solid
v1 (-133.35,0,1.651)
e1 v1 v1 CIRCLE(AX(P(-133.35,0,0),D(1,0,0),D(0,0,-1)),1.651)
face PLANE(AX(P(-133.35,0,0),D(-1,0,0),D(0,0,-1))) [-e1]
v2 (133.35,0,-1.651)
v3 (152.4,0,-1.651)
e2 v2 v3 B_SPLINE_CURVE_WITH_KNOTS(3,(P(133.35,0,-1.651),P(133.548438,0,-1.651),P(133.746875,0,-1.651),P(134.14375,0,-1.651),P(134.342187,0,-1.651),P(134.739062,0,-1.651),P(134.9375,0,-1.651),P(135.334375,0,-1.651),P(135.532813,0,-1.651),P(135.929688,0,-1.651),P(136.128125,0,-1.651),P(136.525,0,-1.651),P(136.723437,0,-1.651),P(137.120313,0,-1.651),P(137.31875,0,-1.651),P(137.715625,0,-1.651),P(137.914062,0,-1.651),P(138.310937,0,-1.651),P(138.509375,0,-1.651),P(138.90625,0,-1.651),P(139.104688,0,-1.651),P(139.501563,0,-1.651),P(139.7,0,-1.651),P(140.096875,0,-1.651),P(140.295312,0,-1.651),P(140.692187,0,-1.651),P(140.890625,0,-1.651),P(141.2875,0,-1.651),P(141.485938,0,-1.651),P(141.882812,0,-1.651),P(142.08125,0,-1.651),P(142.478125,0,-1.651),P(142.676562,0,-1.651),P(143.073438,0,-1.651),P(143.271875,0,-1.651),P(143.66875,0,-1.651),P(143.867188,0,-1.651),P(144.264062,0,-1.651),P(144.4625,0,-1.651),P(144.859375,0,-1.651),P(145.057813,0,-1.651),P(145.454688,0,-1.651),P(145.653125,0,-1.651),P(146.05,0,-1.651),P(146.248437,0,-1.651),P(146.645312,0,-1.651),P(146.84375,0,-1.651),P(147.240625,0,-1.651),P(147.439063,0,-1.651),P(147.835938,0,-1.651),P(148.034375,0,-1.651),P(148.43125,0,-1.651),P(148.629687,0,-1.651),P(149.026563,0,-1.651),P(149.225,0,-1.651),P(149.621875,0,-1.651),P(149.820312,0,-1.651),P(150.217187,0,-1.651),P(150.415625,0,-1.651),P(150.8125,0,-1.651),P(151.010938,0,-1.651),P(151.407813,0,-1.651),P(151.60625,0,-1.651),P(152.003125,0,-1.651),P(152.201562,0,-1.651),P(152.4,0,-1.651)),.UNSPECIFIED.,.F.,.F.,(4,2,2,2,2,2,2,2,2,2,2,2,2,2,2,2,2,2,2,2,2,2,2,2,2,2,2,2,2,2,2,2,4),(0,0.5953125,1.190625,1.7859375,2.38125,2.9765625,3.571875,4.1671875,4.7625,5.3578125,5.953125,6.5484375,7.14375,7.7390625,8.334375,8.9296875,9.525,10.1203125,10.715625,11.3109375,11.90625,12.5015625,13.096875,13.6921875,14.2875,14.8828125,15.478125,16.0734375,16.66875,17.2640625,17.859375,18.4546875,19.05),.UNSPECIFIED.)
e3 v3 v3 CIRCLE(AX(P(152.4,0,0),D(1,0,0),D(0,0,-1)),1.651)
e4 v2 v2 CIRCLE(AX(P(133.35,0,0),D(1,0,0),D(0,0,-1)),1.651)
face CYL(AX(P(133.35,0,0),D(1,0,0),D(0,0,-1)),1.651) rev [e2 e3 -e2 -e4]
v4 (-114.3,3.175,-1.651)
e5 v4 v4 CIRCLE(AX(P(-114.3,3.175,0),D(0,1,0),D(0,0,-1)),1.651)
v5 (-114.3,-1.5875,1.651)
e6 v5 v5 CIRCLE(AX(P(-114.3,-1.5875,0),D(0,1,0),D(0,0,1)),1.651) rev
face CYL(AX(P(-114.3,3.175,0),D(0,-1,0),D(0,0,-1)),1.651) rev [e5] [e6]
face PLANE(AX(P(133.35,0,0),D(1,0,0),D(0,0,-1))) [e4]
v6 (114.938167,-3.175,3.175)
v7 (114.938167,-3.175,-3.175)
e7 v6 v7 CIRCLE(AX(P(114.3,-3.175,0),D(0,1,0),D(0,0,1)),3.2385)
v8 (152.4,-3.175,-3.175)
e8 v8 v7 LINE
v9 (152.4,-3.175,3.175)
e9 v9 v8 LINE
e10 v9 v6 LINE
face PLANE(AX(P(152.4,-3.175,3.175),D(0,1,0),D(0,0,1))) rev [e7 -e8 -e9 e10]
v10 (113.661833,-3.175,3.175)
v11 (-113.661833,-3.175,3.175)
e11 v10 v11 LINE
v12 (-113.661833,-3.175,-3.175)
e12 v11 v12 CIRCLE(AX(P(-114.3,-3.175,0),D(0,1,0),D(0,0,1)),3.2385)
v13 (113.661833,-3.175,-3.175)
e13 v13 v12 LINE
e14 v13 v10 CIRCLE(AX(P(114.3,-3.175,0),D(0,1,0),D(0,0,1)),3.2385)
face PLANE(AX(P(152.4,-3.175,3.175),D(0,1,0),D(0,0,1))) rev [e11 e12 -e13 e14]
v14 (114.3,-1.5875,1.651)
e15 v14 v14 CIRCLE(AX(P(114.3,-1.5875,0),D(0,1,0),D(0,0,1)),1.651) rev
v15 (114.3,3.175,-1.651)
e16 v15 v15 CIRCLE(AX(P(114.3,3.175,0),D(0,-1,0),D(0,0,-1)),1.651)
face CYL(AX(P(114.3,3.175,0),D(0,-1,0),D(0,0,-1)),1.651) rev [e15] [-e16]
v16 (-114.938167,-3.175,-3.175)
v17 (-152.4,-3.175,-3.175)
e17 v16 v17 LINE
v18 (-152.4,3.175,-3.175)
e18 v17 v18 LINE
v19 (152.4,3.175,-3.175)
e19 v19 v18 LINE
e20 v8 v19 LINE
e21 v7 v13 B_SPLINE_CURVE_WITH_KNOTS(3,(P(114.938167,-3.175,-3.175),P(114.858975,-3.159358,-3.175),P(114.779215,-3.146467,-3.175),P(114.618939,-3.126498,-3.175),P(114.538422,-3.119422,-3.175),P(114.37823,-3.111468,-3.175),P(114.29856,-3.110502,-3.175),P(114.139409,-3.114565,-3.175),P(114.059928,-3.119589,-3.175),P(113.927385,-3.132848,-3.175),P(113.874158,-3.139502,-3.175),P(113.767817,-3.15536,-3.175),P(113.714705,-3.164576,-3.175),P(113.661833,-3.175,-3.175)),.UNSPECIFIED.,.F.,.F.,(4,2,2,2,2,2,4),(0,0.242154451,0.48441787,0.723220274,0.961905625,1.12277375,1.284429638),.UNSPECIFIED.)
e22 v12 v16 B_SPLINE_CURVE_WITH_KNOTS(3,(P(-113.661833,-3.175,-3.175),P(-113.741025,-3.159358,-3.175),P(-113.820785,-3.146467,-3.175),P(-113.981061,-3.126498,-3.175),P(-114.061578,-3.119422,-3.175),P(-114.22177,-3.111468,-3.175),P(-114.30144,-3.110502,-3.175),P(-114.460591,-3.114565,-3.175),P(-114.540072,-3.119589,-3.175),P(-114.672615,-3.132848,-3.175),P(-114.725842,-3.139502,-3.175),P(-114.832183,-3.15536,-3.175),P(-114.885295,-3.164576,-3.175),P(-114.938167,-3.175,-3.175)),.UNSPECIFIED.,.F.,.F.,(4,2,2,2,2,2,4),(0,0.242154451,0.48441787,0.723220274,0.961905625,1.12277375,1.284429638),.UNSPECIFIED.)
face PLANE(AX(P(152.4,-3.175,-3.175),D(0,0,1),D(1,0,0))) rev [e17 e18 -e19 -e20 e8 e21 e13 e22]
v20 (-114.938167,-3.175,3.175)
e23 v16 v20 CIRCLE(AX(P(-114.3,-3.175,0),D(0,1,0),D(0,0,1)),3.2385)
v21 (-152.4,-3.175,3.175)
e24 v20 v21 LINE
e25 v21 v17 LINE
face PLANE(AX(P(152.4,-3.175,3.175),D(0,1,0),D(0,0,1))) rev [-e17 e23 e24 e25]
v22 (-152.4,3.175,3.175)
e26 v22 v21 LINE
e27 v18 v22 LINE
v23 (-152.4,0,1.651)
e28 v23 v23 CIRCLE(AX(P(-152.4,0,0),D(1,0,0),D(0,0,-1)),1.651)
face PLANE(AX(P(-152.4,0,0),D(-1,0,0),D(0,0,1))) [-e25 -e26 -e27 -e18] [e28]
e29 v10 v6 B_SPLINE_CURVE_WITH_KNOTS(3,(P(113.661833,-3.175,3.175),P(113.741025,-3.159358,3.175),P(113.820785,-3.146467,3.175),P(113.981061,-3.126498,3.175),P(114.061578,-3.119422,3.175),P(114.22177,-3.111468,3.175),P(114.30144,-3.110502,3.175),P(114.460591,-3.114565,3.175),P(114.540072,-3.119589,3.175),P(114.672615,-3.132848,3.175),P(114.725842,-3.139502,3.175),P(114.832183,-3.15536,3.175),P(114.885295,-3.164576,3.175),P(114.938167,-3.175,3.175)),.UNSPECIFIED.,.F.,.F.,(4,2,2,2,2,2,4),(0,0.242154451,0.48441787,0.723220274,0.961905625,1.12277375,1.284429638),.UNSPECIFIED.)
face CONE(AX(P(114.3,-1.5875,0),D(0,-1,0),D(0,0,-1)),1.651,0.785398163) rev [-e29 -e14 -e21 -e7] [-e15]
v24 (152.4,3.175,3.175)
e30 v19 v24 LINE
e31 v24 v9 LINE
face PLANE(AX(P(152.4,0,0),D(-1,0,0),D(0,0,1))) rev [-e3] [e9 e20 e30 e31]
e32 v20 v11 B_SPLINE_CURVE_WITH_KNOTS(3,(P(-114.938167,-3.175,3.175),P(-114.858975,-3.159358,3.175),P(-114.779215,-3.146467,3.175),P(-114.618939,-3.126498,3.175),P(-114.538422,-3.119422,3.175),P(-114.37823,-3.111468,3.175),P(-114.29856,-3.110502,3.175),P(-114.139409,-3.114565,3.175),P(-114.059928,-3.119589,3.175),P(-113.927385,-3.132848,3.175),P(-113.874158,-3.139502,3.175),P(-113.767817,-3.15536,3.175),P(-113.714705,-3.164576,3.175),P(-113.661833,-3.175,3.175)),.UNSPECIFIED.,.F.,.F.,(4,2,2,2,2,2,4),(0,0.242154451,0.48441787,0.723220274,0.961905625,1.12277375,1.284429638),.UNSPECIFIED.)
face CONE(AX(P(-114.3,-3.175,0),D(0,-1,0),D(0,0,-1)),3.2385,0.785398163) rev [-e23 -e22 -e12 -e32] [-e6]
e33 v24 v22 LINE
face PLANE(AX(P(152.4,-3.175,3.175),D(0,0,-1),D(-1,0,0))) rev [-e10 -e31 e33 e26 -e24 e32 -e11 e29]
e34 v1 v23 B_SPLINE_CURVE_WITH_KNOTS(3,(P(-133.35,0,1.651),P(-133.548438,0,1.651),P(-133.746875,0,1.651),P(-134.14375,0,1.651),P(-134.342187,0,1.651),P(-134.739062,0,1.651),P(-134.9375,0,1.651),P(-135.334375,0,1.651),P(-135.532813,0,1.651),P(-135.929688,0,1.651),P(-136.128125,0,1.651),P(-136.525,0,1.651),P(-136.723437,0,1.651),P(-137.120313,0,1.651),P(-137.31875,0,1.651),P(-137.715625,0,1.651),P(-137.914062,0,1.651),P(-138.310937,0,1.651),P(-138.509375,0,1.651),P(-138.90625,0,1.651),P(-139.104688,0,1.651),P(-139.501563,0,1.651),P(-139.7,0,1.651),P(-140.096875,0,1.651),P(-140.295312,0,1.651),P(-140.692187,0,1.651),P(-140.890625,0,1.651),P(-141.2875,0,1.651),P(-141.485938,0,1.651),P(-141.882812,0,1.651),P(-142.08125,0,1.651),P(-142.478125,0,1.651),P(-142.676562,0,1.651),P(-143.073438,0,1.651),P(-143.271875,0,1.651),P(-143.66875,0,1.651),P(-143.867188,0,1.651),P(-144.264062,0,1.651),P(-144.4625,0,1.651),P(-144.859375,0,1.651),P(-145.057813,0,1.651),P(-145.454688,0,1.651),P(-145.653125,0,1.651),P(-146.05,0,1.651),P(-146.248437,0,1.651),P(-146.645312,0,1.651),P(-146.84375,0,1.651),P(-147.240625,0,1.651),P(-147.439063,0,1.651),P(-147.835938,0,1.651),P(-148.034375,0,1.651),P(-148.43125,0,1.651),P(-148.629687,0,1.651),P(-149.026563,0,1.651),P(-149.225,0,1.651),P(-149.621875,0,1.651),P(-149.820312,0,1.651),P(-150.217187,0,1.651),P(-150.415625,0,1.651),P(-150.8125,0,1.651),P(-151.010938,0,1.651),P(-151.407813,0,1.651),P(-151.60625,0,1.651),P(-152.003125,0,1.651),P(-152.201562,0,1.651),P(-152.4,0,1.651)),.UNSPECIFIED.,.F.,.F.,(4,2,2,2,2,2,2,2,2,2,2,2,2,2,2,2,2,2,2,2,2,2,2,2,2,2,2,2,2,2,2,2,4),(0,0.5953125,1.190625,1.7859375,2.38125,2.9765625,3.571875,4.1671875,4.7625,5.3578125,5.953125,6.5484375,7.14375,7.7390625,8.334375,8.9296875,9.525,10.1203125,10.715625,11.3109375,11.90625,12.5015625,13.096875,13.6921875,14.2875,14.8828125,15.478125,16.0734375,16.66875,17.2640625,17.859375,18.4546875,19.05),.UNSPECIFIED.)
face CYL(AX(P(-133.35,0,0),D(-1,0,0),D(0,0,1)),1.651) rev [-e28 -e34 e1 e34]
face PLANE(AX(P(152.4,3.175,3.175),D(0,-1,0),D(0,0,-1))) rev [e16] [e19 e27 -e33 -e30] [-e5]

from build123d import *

# Parameters (mm, degrees)
SKETCH1_W                = 6.35
SKETCH1_H                = 6.35
BOSS_EXTRUDE1_DEPTH      = 152.4
SKETCH2_R                = 1.651
CUT_EXTRUDE1_DEPTH       = 19.05
SKETCH3_R                = 1.651
CUT_EXTRUDE2_DEPTH       = 153.565274965
CHAMFER1_SIZE            = 1.5875
CHAMFER1_OF_MIRROR1_SIZE = 1.5875


with BuildPart() as part:
    # Sketch1 → Boss-Extrude1 (new, symmetric)
    with BuildSketch(Plane(origin=(0, 0, 0), x_dir=(0, 0, -1), z_dir=(1, 0, 0))):
        Rectangle(SKETCH1_W, SKETCH1_H)
    extrude(amount=BOSS_EXTRUDE1_DEPTH, both=True)

    # Sketch2 → Cut-Extrude1 (cut)
    with BuildSketch(Plane(origin=(152.4, 0, 0), x_dir=(0, 0, -1), z_dir=(1, 0, 0))):
        Circle(SKETCH2_R)
    cut_extrude1 = extrude(amount=-CUT_EXTRUDE1_DEPTH, mode=Mode.SUBTRACT)

    # Sketch3 → Cut-Extrude2 (cut, through all)
    with BuildSketch(Plane(origin=(0, -3.175, 0), x_dir=(-1, 0, 0), z_dir=(0, -1, 0))):
        with Locations(Location((-114.3, 0, 0), (0, 0, 90))):
            Circle(SKETCH3_R)
    cut_extrude2 = extrude(amount=-CUT_EXTRUDE2_DEPTH, mode=Mode.SUBTRACT)

    # Chamfer1
    # the kernel refuses this chamfer: 1.5875 mm, written as the material it takes off along each edge
    with BuildSketch(Plane(origin=(114.3, -3.175, 0), x_dir=(0, 0, -1), z_dir=(-1, 0, 0))) as chamfer1_piece_1:
        Polygon((1.651 + CHAMFER1_SIZE, 0), (1.651, -CHAMFER1_SIZE), (1.651, 0), align=None)
    revolve(axis=Axis((114.3, -3.175, 0), (0, -1, 0)), mode=Mode.SUBTRACT)

    # Mirror1: Cut-Extrude1, Cut-Extrude2 across plane
    add(cut_extrude1.mirror(Plane(origin=(0, 0, 0), x_dir=(0, 0, 1), z_dir=(1, 0, 0))), mode=Mode.SUBTRACT)
    add(cut_extrude2.mirror(Plane(origin=(0, 0, 0), x_dir=(0, 0, 1), z_dir=(1, 0, 0))), mode=Mode.SUBTRACT)

    # Chamfer1 of Mirror1
    # the kernel refuses this chamfer: 1.5875 mm, written as the material it takes off along each edge
    with BuildSketch(Plane(origin=(-114.3, -3.175, 0), x_dir=(0, 0, -1), z_dir=(1, 0, 0))) as chamfer1_of_mirror1_piece_1:
        Polygon((1.651 + CHAMFER1_OF_MIRROR1_SIZE, 0), (1.651, CHAMFER1_OF_MIRROR1_SIZE), (1.651, 0), align=None)
    revolve(axis=Axis((-114.3, -3.175, 0), (0, 1, 0)), mode=Mode.SUBTRACT)


solid = part.part
